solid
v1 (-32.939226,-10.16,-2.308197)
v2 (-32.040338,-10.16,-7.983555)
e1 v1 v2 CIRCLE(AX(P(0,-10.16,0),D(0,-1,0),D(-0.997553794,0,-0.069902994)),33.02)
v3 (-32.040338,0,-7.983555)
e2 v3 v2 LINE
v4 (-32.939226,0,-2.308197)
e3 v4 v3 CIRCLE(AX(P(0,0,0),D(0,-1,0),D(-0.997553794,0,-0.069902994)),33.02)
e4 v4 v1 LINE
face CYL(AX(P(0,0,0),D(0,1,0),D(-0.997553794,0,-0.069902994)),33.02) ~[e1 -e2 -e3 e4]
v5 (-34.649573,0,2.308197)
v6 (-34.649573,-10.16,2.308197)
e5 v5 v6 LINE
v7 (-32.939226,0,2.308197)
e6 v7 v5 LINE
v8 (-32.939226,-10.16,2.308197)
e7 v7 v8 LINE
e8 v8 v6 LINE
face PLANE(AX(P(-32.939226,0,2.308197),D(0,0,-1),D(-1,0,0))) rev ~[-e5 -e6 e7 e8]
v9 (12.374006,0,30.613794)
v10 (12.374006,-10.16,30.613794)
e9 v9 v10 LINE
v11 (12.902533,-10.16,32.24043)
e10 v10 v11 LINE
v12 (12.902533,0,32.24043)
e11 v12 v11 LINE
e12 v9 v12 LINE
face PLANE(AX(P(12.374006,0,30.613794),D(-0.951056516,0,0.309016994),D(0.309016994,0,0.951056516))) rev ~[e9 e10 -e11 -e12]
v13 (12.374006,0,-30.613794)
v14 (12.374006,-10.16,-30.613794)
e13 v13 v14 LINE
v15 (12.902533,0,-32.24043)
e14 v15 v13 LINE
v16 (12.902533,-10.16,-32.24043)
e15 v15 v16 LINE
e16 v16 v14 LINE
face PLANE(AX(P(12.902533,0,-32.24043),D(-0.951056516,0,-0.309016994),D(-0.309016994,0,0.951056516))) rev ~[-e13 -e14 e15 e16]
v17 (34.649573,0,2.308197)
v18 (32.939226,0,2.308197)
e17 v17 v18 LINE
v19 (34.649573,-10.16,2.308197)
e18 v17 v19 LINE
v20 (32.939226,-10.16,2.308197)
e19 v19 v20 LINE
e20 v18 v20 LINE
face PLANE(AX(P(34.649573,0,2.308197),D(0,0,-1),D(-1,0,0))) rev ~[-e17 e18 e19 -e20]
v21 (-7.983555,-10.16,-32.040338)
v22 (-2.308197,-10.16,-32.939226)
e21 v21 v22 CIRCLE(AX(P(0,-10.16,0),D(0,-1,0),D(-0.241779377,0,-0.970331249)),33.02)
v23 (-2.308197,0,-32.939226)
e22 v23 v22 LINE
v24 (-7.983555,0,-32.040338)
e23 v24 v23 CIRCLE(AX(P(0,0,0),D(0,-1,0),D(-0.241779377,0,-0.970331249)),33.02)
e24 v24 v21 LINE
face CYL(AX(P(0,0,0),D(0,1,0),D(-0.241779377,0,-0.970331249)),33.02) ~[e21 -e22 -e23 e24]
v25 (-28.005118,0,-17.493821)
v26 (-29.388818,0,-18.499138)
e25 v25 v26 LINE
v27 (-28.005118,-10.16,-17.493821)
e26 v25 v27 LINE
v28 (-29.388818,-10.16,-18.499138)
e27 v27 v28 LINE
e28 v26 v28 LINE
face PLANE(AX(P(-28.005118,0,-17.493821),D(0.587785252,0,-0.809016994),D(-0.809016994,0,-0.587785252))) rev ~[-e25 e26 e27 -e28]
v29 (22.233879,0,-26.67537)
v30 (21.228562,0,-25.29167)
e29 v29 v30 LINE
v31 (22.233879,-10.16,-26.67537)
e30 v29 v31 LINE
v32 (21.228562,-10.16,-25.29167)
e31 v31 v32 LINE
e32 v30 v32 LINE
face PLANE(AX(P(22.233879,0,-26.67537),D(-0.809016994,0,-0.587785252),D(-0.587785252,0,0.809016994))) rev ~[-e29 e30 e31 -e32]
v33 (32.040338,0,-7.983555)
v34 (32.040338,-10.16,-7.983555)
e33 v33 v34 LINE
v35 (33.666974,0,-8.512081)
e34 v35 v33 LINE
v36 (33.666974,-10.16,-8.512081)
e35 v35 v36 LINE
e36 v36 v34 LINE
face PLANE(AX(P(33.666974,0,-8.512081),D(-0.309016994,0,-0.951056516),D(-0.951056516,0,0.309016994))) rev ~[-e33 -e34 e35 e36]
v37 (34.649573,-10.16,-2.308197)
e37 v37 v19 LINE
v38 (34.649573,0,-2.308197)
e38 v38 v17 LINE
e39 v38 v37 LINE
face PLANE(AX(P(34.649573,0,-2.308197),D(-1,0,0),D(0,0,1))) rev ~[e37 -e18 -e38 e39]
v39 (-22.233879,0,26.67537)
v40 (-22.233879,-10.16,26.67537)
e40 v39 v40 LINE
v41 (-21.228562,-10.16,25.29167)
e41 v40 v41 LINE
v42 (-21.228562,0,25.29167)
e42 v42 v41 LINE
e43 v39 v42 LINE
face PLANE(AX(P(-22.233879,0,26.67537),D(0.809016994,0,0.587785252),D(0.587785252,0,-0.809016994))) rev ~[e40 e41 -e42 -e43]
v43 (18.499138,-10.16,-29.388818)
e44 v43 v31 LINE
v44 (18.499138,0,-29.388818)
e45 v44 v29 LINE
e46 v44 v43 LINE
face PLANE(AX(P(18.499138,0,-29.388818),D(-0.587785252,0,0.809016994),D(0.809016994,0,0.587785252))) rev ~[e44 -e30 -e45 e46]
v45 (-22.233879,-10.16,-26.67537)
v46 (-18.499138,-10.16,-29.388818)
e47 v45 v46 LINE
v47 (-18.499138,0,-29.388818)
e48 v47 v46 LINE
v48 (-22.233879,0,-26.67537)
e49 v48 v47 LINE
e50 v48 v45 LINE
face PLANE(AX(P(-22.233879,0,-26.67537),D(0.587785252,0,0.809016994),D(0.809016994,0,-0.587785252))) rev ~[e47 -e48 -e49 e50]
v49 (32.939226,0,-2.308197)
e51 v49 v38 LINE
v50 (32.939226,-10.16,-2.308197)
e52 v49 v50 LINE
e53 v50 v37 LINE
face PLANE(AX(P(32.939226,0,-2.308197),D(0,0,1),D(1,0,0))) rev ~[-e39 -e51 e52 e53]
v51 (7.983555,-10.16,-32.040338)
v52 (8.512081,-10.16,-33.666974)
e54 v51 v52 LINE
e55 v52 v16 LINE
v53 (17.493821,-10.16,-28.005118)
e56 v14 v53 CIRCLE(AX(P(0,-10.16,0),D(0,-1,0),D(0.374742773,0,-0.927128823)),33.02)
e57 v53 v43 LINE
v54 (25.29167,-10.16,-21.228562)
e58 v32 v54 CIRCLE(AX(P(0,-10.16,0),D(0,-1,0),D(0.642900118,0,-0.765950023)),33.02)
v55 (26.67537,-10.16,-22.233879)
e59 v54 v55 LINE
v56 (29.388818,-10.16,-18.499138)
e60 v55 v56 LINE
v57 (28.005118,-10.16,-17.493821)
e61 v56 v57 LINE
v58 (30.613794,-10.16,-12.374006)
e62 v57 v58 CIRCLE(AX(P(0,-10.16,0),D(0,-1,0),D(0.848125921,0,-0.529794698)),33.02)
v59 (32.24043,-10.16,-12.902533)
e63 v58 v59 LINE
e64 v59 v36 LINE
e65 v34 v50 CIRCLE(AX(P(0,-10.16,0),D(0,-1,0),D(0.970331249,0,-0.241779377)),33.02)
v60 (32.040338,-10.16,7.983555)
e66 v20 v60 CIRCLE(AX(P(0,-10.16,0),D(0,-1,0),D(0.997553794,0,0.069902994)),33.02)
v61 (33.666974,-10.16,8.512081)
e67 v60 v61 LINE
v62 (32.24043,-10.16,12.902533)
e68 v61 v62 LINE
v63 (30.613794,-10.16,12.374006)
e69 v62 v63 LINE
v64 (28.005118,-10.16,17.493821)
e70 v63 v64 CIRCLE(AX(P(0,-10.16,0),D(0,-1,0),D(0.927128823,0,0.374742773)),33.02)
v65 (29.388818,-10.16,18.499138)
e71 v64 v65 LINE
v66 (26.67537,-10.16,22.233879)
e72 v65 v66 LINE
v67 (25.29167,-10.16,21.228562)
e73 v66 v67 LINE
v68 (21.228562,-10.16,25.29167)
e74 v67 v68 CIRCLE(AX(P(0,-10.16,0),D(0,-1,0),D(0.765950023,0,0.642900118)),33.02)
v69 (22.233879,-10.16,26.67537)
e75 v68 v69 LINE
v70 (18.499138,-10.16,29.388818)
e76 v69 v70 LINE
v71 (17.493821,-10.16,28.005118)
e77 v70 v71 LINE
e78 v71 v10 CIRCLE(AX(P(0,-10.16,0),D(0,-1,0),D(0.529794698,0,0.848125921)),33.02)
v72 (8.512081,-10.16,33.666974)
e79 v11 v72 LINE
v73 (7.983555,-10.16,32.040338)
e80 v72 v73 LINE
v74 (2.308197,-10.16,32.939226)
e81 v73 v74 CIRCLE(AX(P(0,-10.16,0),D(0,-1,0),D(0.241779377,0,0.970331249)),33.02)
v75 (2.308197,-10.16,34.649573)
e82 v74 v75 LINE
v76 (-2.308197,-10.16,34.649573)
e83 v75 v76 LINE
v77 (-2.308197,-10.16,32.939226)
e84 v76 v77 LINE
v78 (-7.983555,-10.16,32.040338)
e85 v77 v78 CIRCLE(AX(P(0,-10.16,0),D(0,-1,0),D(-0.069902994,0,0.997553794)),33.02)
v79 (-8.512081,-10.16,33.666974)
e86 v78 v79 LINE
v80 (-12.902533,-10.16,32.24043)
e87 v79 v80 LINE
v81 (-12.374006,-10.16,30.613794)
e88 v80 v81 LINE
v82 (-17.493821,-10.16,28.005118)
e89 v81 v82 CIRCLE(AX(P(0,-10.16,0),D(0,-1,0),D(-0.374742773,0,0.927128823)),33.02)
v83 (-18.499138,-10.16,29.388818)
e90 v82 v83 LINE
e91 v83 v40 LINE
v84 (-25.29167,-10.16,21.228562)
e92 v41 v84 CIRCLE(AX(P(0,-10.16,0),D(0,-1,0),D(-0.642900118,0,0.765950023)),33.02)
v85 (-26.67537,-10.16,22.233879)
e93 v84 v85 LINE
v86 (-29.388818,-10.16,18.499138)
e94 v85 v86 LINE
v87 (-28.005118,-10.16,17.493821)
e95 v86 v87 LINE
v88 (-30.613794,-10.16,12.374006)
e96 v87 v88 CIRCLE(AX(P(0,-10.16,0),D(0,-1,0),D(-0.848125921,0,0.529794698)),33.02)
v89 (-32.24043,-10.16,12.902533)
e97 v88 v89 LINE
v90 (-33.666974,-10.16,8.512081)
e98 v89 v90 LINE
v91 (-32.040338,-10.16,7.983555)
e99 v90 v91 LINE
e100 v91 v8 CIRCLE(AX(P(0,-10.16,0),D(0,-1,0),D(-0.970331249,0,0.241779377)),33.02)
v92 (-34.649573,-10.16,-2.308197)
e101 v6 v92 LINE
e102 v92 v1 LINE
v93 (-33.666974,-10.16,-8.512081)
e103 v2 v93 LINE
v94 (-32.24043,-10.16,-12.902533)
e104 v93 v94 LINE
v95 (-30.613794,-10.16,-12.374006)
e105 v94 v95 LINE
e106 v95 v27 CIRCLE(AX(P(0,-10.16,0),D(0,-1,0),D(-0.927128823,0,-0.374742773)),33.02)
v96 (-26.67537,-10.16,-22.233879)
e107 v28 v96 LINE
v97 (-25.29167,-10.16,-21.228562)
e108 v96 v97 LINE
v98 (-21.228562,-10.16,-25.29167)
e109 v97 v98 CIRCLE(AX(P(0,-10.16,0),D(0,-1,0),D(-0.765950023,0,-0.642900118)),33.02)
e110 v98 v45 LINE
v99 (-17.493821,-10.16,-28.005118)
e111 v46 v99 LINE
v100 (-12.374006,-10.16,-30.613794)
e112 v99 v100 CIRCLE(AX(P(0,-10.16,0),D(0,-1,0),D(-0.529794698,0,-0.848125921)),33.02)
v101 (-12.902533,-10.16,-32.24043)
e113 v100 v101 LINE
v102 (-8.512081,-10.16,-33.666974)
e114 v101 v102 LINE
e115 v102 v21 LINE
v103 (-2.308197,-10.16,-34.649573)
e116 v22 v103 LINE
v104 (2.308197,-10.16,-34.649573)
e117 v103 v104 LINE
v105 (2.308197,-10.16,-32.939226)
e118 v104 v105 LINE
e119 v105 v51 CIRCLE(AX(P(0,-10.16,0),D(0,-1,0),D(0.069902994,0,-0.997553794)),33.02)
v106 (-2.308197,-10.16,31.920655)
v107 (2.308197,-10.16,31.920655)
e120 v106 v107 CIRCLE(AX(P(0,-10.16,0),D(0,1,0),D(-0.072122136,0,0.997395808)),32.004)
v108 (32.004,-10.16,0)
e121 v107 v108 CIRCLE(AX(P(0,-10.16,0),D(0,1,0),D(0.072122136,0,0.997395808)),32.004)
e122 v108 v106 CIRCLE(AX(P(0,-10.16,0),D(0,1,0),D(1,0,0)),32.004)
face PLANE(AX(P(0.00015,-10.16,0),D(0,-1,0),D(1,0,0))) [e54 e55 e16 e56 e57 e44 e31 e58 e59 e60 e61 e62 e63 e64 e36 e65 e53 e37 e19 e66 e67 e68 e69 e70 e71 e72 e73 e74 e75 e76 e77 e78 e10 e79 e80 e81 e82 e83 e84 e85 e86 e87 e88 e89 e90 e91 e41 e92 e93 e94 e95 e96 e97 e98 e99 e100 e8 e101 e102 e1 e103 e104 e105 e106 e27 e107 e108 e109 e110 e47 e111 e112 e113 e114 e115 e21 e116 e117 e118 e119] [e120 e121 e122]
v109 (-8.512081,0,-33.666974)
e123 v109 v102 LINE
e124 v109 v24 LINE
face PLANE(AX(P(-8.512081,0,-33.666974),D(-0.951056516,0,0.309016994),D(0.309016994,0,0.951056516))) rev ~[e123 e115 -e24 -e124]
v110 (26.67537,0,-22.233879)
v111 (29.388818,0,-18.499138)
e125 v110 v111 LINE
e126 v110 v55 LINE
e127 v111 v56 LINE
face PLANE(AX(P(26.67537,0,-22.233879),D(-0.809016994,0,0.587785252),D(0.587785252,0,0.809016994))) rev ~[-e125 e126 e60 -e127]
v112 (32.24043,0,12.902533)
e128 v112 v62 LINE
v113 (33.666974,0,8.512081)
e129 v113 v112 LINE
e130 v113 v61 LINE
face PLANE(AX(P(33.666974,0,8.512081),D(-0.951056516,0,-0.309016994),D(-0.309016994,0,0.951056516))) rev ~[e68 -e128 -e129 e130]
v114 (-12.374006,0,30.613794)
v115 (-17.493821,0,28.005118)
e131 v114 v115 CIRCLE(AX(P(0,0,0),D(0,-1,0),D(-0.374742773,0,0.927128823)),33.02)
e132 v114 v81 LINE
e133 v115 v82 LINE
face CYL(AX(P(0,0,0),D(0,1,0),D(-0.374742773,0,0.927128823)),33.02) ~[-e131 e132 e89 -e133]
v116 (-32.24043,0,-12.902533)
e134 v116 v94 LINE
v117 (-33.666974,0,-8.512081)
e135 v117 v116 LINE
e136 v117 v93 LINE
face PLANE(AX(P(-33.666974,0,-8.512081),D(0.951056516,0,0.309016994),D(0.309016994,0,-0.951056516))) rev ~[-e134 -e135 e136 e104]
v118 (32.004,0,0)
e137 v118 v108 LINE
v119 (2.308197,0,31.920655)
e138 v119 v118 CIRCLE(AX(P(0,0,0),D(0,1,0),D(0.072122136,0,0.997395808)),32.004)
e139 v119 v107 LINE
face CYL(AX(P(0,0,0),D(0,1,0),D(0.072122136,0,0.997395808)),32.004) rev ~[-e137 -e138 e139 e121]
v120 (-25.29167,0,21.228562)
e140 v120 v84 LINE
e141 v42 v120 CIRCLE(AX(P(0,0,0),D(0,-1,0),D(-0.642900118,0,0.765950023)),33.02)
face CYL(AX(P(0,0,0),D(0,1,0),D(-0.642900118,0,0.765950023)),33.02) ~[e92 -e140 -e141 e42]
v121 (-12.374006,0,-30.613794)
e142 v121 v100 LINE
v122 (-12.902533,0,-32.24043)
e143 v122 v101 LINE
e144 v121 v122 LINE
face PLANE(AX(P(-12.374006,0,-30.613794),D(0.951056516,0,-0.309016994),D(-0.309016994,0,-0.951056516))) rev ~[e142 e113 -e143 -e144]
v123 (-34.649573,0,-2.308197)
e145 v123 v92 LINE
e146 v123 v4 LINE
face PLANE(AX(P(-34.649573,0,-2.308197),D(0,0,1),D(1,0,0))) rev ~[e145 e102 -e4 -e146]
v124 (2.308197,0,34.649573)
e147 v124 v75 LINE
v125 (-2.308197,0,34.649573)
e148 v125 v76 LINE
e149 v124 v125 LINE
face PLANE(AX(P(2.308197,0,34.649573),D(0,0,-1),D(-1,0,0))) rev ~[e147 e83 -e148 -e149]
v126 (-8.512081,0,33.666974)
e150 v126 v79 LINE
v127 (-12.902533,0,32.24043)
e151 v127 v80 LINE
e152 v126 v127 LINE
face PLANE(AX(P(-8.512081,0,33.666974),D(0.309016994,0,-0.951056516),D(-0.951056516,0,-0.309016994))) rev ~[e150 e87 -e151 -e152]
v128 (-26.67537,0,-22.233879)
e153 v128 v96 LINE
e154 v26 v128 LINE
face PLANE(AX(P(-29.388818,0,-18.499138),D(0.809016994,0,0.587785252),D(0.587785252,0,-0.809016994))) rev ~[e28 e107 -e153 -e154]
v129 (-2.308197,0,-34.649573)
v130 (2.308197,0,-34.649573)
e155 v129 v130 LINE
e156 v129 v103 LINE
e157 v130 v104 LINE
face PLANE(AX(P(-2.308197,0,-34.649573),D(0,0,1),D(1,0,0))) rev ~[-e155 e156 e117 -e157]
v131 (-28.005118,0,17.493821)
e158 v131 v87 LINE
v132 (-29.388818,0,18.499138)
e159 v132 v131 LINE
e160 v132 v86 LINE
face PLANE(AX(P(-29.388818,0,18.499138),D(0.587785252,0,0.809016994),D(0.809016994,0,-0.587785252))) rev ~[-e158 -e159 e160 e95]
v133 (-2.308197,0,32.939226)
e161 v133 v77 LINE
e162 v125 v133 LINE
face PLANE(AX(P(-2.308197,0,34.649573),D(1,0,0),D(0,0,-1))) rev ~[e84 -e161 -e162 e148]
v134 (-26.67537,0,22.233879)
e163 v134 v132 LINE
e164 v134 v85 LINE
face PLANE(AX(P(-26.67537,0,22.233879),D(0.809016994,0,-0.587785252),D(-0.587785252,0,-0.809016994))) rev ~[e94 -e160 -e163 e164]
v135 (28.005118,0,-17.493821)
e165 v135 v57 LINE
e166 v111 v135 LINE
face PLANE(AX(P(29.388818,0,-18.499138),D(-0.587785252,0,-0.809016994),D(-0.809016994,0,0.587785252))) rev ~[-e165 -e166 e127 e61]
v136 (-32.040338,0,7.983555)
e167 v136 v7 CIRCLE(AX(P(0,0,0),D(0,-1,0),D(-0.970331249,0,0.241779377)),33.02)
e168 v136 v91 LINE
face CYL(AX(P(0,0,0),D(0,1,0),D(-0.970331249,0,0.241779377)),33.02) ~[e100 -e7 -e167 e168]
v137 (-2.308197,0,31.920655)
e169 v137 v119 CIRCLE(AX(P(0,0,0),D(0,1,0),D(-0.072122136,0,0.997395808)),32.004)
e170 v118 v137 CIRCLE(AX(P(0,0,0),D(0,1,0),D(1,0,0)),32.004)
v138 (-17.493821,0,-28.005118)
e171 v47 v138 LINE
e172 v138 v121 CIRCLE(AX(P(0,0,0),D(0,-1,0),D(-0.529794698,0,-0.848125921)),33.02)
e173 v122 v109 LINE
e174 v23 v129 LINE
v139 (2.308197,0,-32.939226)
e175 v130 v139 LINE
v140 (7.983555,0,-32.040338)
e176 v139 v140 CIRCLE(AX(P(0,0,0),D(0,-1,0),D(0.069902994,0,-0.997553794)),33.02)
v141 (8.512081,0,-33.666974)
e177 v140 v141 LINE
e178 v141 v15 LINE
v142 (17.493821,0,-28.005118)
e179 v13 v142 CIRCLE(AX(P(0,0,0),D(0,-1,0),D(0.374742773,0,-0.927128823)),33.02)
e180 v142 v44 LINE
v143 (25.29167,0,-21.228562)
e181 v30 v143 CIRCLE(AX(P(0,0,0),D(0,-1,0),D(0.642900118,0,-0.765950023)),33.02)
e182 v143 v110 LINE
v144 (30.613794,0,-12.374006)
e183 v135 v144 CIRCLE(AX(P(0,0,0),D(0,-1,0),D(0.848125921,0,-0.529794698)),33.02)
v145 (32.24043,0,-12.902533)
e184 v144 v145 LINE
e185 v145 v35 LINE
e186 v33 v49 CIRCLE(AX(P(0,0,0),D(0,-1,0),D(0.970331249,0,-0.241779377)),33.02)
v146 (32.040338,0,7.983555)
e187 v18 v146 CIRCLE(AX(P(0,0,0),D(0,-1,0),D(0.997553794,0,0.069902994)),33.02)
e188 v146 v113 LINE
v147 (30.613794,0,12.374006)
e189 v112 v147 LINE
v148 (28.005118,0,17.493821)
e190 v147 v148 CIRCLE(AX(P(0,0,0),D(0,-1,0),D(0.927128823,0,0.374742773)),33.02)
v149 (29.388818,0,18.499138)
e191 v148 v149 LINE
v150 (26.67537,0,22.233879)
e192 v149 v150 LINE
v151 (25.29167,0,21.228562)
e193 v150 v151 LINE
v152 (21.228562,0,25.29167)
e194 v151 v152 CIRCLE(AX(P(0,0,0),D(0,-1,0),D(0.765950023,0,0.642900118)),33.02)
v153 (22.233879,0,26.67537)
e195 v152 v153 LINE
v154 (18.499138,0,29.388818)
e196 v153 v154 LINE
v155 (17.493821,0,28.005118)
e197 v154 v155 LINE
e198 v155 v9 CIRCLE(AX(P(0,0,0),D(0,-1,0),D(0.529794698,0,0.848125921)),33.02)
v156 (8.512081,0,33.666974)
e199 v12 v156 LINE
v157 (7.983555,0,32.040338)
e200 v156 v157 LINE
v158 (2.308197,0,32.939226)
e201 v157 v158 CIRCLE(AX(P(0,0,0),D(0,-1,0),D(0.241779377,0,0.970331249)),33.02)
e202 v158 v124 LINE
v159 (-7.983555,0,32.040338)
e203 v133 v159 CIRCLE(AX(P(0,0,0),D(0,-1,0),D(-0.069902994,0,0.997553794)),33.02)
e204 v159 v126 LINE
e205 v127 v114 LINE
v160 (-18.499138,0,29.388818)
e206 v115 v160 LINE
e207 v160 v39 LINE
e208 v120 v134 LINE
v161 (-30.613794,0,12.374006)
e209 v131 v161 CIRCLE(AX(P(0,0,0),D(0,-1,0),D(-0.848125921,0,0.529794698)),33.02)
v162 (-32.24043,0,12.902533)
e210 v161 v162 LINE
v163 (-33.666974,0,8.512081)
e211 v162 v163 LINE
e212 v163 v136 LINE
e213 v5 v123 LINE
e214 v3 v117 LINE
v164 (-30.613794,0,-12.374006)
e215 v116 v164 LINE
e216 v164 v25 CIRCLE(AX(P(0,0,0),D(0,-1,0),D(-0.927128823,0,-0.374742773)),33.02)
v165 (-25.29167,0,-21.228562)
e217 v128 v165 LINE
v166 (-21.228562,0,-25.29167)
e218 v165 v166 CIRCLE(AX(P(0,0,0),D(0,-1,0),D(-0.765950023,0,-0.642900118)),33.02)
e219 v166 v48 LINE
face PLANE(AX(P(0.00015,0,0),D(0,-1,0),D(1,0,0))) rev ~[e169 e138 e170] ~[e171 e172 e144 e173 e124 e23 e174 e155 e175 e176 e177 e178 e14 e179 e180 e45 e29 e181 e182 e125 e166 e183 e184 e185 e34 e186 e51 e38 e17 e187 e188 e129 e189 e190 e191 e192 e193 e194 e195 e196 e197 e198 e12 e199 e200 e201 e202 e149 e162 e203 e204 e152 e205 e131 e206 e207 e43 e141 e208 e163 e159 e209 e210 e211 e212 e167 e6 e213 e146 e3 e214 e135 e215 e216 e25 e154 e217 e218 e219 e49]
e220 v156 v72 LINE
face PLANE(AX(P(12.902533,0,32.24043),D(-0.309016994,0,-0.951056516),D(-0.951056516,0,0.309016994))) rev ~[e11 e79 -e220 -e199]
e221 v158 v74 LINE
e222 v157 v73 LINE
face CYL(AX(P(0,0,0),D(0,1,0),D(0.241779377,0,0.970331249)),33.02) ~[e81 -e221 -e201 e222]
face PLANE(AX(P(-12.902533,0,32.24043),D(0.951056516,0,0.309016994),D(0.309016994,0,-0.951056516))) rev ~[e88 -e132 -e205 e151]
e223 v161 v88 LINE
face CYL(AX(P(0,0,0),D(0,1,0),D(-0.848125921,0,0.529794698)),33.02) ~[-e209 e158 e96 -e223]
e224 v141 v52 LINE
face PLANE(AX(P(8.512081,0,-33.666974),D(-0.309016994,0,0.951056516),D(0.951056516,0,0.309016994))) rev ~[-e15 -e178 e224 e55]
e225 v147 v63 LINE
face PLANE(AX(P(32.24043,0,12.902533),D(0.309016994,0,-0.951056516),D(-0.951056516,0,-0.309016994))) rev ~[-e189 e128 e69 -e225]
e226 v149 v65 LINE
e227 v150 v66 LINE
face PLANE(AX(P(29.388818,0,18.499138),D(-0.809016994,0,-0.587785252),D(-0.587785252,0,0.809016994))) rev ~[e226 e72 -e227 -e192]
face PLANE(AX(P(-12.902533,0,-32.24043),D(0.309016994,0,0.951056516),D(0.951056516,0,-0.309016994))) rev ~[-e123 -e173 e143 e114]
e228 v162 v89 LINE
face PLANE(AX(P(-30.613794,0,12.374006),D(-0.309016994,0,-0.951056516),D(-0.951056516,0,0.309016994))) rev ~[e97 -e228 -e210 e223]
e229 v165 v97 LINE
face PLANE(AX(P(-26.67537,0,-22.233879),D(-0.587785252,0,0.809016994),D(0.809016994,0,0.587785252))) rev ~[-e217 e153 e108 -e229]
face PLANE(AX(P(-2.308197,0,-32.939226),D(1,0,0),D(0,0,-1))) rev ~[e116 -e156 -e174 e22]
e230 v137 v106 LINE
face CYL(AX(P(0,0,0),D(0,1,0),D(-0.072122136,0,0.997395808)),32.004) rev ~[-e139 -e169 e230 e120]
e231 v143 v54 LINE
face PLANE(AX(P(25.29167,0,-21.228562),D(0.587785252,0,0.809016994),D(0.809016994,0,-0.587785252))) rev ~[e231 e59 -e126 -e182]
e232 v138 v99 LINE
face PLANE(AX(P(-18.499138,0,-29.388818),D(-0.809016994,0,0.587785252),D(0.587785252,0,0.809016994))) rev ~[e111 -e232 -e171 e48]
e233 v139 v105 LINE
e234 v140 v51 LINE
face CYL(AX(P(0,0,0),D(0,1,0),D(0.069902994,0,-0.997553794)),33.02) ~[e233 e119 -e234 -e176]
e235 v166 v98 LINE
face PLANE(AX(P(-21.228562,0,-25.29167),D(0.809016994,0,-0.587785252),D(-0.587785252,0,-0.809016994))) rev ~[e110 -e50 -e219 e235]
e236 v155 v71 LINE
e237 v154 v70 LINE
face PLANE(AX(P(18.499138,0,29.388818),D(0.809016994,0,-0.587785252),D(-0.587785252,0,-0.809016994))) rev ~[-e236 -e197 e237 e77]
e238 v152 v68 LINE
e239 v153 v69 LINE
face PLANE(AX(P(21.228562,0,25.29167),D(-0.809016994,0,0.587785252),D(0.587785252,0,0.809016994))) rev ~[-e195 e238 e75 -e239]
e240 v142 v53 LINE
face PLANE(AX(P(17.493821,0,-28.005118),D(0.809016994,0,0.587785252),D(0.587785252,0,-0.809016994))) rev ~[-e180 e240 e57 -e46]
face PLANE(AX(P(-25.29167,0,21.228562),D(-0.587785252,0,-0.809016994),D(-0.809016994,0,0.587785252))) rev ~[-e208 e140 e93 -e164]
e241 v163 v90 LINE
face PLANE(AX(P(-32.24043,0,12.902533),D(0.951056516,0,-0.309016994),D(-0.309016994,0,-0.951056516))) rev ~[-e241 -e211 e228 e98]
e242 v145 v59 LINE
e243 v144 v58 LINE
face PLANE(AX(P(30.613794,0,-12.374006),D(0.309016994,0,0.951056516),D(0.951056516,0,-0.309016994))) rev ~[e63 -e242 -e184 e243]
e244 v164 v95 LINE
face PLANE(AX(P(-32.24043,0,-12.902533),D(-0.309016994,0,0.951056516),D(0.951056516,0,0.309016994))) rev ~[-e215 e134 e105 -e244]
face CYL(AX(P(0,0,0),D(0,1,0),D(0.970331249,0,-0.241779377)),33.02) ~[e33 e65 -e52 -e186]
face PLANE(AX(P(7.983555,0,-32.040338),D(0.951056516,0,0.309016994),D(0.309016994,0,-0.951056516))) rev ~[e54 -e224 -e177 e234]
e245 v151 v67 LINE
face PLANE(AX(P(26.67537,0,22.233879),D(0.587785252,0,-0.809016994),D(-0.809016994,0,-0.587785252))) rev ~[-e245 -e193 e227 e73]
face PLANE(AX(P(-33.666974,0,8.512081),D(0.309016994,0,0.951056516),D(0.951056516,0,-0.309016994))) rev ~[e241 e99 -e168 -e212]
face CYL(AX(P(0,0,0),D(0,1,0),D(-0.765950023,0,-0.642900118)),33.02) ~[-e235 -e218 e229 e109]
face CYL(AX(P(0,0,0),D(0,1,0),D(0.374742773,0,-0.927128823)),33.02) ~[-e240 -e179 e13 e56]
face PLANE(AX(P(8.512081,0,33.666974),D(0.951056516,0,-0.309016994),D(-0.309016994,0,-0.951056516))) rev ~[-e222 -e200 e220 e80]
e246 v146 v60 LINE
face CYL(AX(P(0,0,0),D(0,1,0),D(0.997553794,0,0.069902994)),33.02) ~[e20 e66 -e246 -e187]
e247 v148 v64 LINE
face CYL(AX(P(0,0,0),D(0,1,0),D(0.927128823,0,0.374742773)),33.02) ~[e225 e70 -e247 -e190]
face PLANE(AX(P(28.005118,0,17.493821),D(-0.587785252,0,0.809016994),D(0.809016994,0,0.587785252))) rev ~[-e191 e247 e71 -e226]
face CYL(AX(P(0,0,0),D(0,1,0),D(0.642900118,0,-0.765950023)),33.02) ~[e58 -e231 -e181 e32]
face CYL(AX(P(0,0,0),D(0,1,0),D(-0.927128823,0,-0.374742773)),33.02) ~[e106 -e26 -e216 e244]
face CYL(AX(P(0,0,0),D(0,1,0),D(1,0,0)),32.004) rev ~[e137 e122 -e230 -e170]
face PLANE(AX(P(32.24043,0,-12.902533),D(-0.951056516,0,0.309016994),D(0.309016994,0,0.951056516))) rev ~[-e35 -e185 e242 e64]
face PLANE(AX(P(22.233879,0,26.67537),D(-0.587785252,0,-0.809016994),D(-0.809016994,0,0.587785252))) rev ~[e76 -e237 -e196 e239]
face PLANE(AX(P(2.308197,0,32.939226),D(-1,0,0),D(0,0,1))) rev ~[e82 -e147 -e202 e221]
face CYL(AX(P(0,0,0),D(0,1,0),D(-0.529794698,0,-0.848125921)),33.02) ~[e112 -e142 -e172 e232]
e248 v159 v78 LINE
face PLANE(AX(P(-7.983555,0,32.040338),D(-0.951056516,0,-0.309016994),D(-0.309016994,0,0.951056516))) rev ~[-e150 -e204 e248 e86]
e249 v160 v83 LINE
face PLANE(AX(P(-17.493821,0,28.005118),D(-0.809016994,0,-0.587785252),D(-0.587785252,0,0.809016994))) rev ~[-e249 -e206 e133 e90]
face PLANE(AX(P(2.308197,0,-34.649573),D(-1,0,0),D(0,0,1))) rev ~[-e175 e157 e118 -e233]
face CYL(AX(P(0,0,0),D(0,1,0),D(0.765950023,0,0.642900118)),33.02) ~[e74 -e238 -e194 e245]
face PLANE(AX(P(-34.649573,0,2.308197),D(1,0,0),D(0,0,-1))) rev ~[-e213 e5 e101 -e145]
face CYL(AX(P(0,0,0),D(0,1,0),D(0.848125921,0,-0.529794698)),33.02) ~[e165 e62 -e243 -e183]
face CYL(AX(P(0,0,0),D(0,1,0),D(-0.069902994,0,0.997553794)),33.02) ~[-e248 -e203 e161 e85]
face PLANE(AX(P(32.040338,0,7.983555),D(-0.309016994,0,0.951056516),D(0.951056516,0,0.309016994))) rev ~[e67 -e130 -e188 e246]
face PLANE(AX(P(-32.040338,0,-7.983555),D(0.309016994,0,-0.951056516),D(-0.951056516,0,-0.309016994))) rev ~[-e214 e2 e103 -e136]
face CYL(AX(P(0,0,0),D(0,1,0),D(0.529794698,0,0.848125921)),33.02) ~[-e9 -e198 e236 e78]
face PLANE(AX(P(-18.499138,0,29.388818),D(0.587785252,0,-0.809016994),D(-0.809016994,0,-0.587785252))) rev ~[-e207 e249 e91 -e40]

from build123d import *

# Parameters (mm, degrees)
F1_DEPTH = 10.16


with BuildPart() as f1:
    # F0 (on Front) → F1 (new body)
    with BuildSketch(Plane.XZ):
        with BuildLine():
            ThreePointArc((32.9392262703, -2.3081968538), (32.9998003891, -1.1548048657), (33.02, 0))
            ThreePointArc((33.02, 0), (32.9998003891, 1.1548048657), (32.9392262703, 2.3081968538))
            ThreePointArc((32.9392262703, 2.3081968538), (32.6134690065, 5.1654660356), (32.0403378403, 7.9835550403))
            ThreePointArc((32.0403378403, 7.9835550403), (31.4038861681, 10.2037411543), (30.6137937319, 12.3740063578))
            ThreePointArc((30.6137937319, 12.3740063578), (29.4210354287, 14.9907663014), (28.0051179043, 17.4938209425))
            ThreePointArc((28.0051179043, 17.4938209425), (26.7137411543, 19.4086690307), (25.2916697641, 21.2285619047))
            ThreePointArc((25.2916697641, 21.2285619047), (23.3486659148, 23.3486659148), (21.2285619047, 25.2916697641))
            ThreePointArc((21.2285619047, 25.2916697641), (19.4086690307, 26.7137411543), (17.4938209425, 28.0051179043))
            ThreePointArc((17.4938209425, 28.0051179043), (14.9907663014, 29.4210354287), (12.3740063578, 30.6137937319))
            ThreePointArc((12.3740063578, 30.6137937319), (10.2037411543, 31.4038861681), (7.9835550403, 32.0403378403))
            ThreePointArc((7.9835550403, 32.0403378403), (5.1654660356, 32.6134690065), (2.3081968538, 32.9392262703))
            ThreePointArc((2.3081968538, 32.9392262703), (0, 33.02), (-2.3081968538, 32.9392262703))
            ThreePointArc((-2.3081968538, 32.9392262703), (-5.1654660356, 32.6134690065), (-7.9835550403, 32.0403378403))
            ThreePointArc((-7.9835550403, 32.0403378403), (-10.2037411543, 31.4038861681), (-12.3740063578, 30.6137937319))
            ThreePointArc((-12.3740063578, 30.6137937319), (-14.9907663014, 29.4210354287), (-17.4938209425, 28.0051179043))
            ThreePointArc((-17.4938209425, 28.0051179043), (-19.4086690307, 26.7137411543), (-21.2285619047, 25.2916697641))
            ThreePointArc((-21.2285619047, 25.2916697641), (-23.3486659148, 23.3486659148), (-25.2916697641, 21.2285619047))
            ThreePointArc((-25.2916697641, 21.2285619047), (-26.7137411543, 19.4086690307), (-28.0051179043, 17.4938209425))
            ThreePointArc((-28.0051179043, 17.4938209425), (-29.4210354287, 14.9907663014), (-30.6137937319, 12.3740063578))
            ThreePointArc((-30.6137937319, 12.3740063578), (-31.4038861681, 10.2037411543), (-32.0403378403, 7.9835550403))
            ThreePointArc((-32.0403378403, 7.9835550403), (-32.6134690065, 5.1654660356), (-32.9392262703, 2.3081968538))
            ThreePointArc((-32.9392262703, 2.3081968538), (-33.02, 0), (-32.9392262703, -2.3081968538))
            ThreePointArc((-32.9392262703, -2.3081968538), (-32.6134690065, -5.1654660356), (-32.0403378403, -7.9835550403))
            ThreePointArc((-32.0403378403, -7.9835550403), (-31.4038861681, -10.2037411543), (-30.6137937319, -12.3740063578))
            ThreePointArc((-30.6137937319, -12.3740063578), (-29.4210354287, -14.9907663014), (-28.0051179043, -17.4938209425))
            ThreePointArc((-28.0051179043, -17.4938209425), (-26.7137411543, -19.4086690307), (-25.2916697641, -21.2285619047))
            ThreePointArc((-25.2916697641, -21.2285619047), (-23.3486659148, -23.3486659148), (-21.2285619047, -25.2916697641))
            ThreePointArc((-21.2285619047, -25.2916697641), (-19.4086690307, -26.7137411543), (-17.4938209425, -28.0051179043))
            ThreePointArc((-17.4938209425, -28.0051179043), (-14.9907663014, -29.4210354287), (-12.3740063578, -30.6137937319))
            ThreePointArc((-12.3740063578, -30.6137937319), (-10.2037411543, -31.4038861681), (-7.9835550403, -32.0403378403))
            ThreePointArc((-7.9835550403, -32.0403378403), (-5.1654660356, -32.6134690065), (-2.3081968538, -32.9392262703))
            ThreePointArc((-2.3081968538, -32.9392262703), (0, -33.02), (2.3081968538, -32.9392262703))
            ThreePointArc((2.3081968538, -32.9392262703), (5.1654660356, -32.6134690065), (7.9835550403, -32.0403378403))
            ThreePointArc((7.9835550403, -32.0403378403), (10.2037411543, -31.4038861681), (12.3740063578, -30.6137937319))
            ThreePointArc((12.3740063578, -30.6137937319), (14.9907663014, -29.4210354287), (17.4938209425, -28.0051179043))
            ThreePointArc((17.4938209425, -28.0051179043), (19.4086690307, -26.7137411543), (21.2285619047, -25.2916697641))
            ThreePointArc((21.2285619047, -25.2916697641), (23.3486659148, -23.3486659148), (25.2916697641, -21.2285619047))
            ThreePointArc((25.2916697641, -21.2285619047), (26.7137411543, -19.4086690307), (28.0051179043, -17.4938209425))
            ThreePointArc((28.0051179043, -17.4938209425), (29.4210354287, -14.9907663014), (30.6137937319, -12.3740063578))
            ThreePointArc((30.6137937319, -12.3740063578), (31.4038861681, -10.2037411543), (32.0403378403, -7.9835550403))
            ThreePointArc((32.0403378403, -7.9835550403), (32.6134690065, -5.1654660356), (32.9392262703, -2.3081968538))
        make_face()
        with BuildLine():
            ThreePointArc((2.3081968538, 31.9206554332), (23.4321098934, 21.7989046042), (32.004, 0))
            ThreePointArc((32.004, 0), (-21.7989046042, -23.4321098934), (-2.3081968538, 31.9206554332))
            ThreePointArc((-2.3081968538, 31.9206554332), (0, 32.004), (2.3081968538, 31.9206554332))
        make_face(mode=Mode.SUBTRACT)
        with BuildLine():
            ThreePointArc((32.9392262703, 2.3081968538), (32.9998003891, 1.1548048657), (33.02, 0))
            ThreePointArc((33.02, 0), (32.9998003891, -1.1548048657), (32.9392262703, -2.3081968538))
            Line((32.9392262703, -2.3081968538), (34.6495732665, -2.3081968538))
            Line((34.6495732665, -2.3081968538), (34.6495732665, 2.3081968538))
            Line((34.6495732665, 2.3081968538), (32.9392262703, 2.3081968538))
        make_face()
        with BuildLine():
            ThreePointArc((30.6137937319, 12.3740063578), (31.4038861681, 10.2037411543), (32.0403378403, 7.9835550403))
            Line((32.0403378403, 7.9835550403), (33.6669744962, 8.5120813284))
            Line((33.6669744962, 8.5120813284), (32.2404303878, 12.9025326459))
            Line((32.2404303878, 12.9025326459), (30.6137937319, 12.3740063578))
        make_face()
        with BuildLine():
            Line((33.6669744962, -8.5120813284), (32.0403378403, -7.9835550403))
            ThreePointArc((32.0403378403, -7.9835550403), (31.4038861681, -10.2037411543), (30.6137937319, -12.3740063578))
            Line((30.6137937319, -12.3740063578), (32.2404303878, -12.9025326459))
            Line((32.2404303878, -12.9025326459), (33.6669744962, -8.5120813284))
        make_face()
        with BuildLine():
            ThreePointArc((25.2916697641, 21.2285619047), (26.7137411543, 19.4086690307), (28.0051179043, 17.4938209425))
            Line((28.0051179043, 17.4938209425), (29.3888176905, 18.4991376832))
            Line((29.3888176905, 18.4991376832), (26.6753695504, 22.2338786454))
            Line((26.6753695504, 22.2338786454), (25.2916697641, 21.2285619047))
        make_face()
        with BuildLine():
            Line((29.3888176905, -18.4991376832), (28.0051179043, -17.4938209425))
            ThreePointArc((28.0051179043, -17.4938209425), (26.7137411543, -19.4086690307), (25.2916697641, -21.2285619047))
            Line((25.2916697641, -21.2285619047), (26.6753695504, -22.2338786454))
            Line((26.6753695504, -22.2338786454), (29.3888176905, -18.4991376832))
        make_face()
        with BuildLine():
            ThreePointArc((17.4938209425, 28.0051179043), (19.4086690307, 26.7137411543), (21.2285619047, 25.2916697641))
            Line((21.2285619047, 25.2916697641), (22.2338786454, 26.6753695504))
            Line((22.2338786454, 26.6753695504), (18.4991376832, 29.3888176905))
            Line((18.4991376832, 29.3888176905), (17.4938209425, 28.0051179043))
        make_face()
        with BuildLine():
            Line((22.2338786454, -26.6753695504), (21.2285619047, -25.2916697641))
            ThreePointArc((21.2285619047, -25.2916697641), (19.4086690307, -26.7137411543), (17.4938209425, -28.0051179043))
            Line((17.4938209425, -28.0051179043), (18.4991376832, -29.3888176905))
            Line((18.4991376832, -29.3888176905), (22.2338786454, -26.6753695504))
        make_face()
        with BuildLine():
            ThreePointArc((7.9835550403, 32.0403378403), (10.2037411543, 31.4038861681), (12.3740063578, 30.6137937319))
            Line((12.3740063578, 30.6137937319), (12.9025326459, 32.2404303878))
            Line((12.9025326459, 32.2404303878), (8.5120813284, 33.6669744962))
            Line((8.5120813284, 33.6669744962), (7.9835550403, 32.0403378403))
        make_face()
        with BuildLine():
            Line((12.9025326459, -32.2404303878), (12.3740063578, -30.6137937319))
            ThreePointArc((12.3740063578, -30.6137937319), (10.2037411543, -31.4038861681), (7.9835550403, -32.0403378403))
            Line((7.9835550403, -32.0403378403), (8.5120813284, -33.6669744962))
            Line((8.5120813284, -33.6669744962), (12.9025326459, -32.2404303878))
        make_face()
        with BuildLine():
            ThreePointArc((-2.3081968538, 32.9392262703), (0, 33.02), (2.3081968538, 32.9392262703))
            Line((2.3081968538, 32.9392262703), (2.3081968538, 34.6495732665))
            Line((2.3081968538, 34.6495732665), (-2.3081968538, 34.6495732665))
            Line((-2.3081968538, 34.6495732665), (-2.3081968538, 32.9392262703))
        make_face()
        with BuildLine():
            Line((2.3081968538, -34.6495732665), (2.3081968538, -32.9392262703))
            ThreePointArc((2.3081968538, -32.9392262703), (0, -33.02), (-2.3081968538, -32.9392262703))
            Line((-2.3081968538, -32.9392262703), (-2.3081968538, -34.6495732665))
            Line((-2.3081968538, -34.6495732665), (2.3081968538, -34.6495732665))
        make_face()
        with BuildLine():
            ThreePointArc((-12.3740063578, 30.6137937319), (-10.2037411543, 31.4038861681), (-7.9835550403, 32.0403378403))
            Line((-7.9835550403, 32.0403378403), (-8.5120813284, 33.6669744962))
            Line((-8.5120813284, 33.6669744962), (-12.9025326459, 32.2404303878))
            Line((-12.9025326459, 32.2404303878), (-12.3740063578, 30.6137937319))
        make_face()
        with BuildLine():
            Line((-8.5120813284, -33.6669744962), (-7.9835550403, -32.0403378403))
            ThreePointArc((-7.9835550403, -32.0403378403), (-10.2037411543, -31.4038861681), (-12.3740063578, -30.6137937319))
            Line((-12.3740063578, -30.6137937319), (-12.9025326459, -32.2404303878))
            Line((-12.9025326459, -32.2404303878), (-8.5120813284, -33.6669744962))
        make_face()
        with BuildLine():
            ThreePointArc((-21.2285619047, 25.2916697641), (-19.4086690307, 26.7137411543), (-17.4938209425, 28.0051179043))
            Line((-17.4938209425, 28.0051179043), (-18.4991376832, 29.3888176905))
            Line((-18.4991376832, 29.3888176905), (-22.2338786454, 26.6753695504))
            Line((-22.2338786454, 26.6753695504), (-21.2285619047, 25.2916697641))
        make_face()
        with BuildLine():
            Line((-18.4991376832, -29.3888176905), (-17.4938209425, -28.0051179043))
            ThreePointArc((-17.4938209425, -28.0051179043), (-19.4086690307, -26.7137411543), (-21.2285619047, -25.2916697641))
            Line((-21.2285619047, -25.2916697641), (-22.2338786454, -26.6753695504))
            Line((-22.2338786454, -26.6753695504), (-18.4991376832, -29.3888176905))
        make_face()
        with BuildLine():
            ThreePointArc((-28.0051179043, 17.4938209425), (-26.7137411543, 19.4086690307), (-25.2916697641, 21.2285619047))
            Line((-25.2916697641, 21.2285619047), (-26.6753695504, 22.2338786454))
            Line((-26.6753695504, 22.2338786454), (-29.3888176905, 18.4991376832))
            Line((-29.3888176905, 18.4991376832), (-28.0051179043, 17.4938209425))
        make_face()
        with BuildLine():
            Line((-26.6753695504, -22.2338786454), (-25.2916697641, -21.2285619047))
            ThreePointArc((-25.2916697641, -21.2285619047), (-26.7137411543, -19.4086690307), (-28.0051179043, -17.4938209425))
            Line((-28.0051179043, -17.4938209425), (-29.3888176905, -18.4991376832))
            Line((-29.3888176905, -18.4991376832), (-26.6753695504, -22.2338786454))
        make_face()
        with BuildLine():
            ThreePointArc((-32.0403378403, 7.9835550403), (-31.4038861681, 10.2037411543), (-30.6137937319, 12.3740063578))
            Line((-30.6137937319, 12.3740063578), (-32.2404303878, 12.9025326459))
            Line((-32.2404303878, 12.9025326459), (-33.6669744962, 8.5120813284))
            Line((-33.6669744962, 8.5120813284), (-32.0403378403, 7.9835550403))
        make_face()
        with BuildLine():
            Line((-32.2404303878, -12.9025326459), (-30.6137937319, -12.3740063578))
            ThreePointArc((-30.6137937319, -12.3740063578), (-31.4038861681, -10.2037411543), (-32.0403378403, -7.9835550403))
            Line((-32.0403378403, -7.9835550403), (-33.6669744962, -8.5120813284))
            Line((-33.6669744962, -8.5120813284), (-32.2404303878, -12.9025326459))
        make_face()
        with BuildLine():
            ThreePointArc((-32.9392262703, -2.3081968538), (-33.02, 0), (-32.9392262703, 2.3081968538))
            Line((-32.9392262703, 2.3081968538), (-34.6495732665, 2.3081968538))
            Line((-34.6495732665, 2.3081968538), (-34.6495732665, -2.3081968538))
            Line((-34.6495732665, -2.3081968538), (-32.9392262703, -2.3081968538))
        make_face()
    extrude(amount=F1_DEPTH)


solid = f1.part
